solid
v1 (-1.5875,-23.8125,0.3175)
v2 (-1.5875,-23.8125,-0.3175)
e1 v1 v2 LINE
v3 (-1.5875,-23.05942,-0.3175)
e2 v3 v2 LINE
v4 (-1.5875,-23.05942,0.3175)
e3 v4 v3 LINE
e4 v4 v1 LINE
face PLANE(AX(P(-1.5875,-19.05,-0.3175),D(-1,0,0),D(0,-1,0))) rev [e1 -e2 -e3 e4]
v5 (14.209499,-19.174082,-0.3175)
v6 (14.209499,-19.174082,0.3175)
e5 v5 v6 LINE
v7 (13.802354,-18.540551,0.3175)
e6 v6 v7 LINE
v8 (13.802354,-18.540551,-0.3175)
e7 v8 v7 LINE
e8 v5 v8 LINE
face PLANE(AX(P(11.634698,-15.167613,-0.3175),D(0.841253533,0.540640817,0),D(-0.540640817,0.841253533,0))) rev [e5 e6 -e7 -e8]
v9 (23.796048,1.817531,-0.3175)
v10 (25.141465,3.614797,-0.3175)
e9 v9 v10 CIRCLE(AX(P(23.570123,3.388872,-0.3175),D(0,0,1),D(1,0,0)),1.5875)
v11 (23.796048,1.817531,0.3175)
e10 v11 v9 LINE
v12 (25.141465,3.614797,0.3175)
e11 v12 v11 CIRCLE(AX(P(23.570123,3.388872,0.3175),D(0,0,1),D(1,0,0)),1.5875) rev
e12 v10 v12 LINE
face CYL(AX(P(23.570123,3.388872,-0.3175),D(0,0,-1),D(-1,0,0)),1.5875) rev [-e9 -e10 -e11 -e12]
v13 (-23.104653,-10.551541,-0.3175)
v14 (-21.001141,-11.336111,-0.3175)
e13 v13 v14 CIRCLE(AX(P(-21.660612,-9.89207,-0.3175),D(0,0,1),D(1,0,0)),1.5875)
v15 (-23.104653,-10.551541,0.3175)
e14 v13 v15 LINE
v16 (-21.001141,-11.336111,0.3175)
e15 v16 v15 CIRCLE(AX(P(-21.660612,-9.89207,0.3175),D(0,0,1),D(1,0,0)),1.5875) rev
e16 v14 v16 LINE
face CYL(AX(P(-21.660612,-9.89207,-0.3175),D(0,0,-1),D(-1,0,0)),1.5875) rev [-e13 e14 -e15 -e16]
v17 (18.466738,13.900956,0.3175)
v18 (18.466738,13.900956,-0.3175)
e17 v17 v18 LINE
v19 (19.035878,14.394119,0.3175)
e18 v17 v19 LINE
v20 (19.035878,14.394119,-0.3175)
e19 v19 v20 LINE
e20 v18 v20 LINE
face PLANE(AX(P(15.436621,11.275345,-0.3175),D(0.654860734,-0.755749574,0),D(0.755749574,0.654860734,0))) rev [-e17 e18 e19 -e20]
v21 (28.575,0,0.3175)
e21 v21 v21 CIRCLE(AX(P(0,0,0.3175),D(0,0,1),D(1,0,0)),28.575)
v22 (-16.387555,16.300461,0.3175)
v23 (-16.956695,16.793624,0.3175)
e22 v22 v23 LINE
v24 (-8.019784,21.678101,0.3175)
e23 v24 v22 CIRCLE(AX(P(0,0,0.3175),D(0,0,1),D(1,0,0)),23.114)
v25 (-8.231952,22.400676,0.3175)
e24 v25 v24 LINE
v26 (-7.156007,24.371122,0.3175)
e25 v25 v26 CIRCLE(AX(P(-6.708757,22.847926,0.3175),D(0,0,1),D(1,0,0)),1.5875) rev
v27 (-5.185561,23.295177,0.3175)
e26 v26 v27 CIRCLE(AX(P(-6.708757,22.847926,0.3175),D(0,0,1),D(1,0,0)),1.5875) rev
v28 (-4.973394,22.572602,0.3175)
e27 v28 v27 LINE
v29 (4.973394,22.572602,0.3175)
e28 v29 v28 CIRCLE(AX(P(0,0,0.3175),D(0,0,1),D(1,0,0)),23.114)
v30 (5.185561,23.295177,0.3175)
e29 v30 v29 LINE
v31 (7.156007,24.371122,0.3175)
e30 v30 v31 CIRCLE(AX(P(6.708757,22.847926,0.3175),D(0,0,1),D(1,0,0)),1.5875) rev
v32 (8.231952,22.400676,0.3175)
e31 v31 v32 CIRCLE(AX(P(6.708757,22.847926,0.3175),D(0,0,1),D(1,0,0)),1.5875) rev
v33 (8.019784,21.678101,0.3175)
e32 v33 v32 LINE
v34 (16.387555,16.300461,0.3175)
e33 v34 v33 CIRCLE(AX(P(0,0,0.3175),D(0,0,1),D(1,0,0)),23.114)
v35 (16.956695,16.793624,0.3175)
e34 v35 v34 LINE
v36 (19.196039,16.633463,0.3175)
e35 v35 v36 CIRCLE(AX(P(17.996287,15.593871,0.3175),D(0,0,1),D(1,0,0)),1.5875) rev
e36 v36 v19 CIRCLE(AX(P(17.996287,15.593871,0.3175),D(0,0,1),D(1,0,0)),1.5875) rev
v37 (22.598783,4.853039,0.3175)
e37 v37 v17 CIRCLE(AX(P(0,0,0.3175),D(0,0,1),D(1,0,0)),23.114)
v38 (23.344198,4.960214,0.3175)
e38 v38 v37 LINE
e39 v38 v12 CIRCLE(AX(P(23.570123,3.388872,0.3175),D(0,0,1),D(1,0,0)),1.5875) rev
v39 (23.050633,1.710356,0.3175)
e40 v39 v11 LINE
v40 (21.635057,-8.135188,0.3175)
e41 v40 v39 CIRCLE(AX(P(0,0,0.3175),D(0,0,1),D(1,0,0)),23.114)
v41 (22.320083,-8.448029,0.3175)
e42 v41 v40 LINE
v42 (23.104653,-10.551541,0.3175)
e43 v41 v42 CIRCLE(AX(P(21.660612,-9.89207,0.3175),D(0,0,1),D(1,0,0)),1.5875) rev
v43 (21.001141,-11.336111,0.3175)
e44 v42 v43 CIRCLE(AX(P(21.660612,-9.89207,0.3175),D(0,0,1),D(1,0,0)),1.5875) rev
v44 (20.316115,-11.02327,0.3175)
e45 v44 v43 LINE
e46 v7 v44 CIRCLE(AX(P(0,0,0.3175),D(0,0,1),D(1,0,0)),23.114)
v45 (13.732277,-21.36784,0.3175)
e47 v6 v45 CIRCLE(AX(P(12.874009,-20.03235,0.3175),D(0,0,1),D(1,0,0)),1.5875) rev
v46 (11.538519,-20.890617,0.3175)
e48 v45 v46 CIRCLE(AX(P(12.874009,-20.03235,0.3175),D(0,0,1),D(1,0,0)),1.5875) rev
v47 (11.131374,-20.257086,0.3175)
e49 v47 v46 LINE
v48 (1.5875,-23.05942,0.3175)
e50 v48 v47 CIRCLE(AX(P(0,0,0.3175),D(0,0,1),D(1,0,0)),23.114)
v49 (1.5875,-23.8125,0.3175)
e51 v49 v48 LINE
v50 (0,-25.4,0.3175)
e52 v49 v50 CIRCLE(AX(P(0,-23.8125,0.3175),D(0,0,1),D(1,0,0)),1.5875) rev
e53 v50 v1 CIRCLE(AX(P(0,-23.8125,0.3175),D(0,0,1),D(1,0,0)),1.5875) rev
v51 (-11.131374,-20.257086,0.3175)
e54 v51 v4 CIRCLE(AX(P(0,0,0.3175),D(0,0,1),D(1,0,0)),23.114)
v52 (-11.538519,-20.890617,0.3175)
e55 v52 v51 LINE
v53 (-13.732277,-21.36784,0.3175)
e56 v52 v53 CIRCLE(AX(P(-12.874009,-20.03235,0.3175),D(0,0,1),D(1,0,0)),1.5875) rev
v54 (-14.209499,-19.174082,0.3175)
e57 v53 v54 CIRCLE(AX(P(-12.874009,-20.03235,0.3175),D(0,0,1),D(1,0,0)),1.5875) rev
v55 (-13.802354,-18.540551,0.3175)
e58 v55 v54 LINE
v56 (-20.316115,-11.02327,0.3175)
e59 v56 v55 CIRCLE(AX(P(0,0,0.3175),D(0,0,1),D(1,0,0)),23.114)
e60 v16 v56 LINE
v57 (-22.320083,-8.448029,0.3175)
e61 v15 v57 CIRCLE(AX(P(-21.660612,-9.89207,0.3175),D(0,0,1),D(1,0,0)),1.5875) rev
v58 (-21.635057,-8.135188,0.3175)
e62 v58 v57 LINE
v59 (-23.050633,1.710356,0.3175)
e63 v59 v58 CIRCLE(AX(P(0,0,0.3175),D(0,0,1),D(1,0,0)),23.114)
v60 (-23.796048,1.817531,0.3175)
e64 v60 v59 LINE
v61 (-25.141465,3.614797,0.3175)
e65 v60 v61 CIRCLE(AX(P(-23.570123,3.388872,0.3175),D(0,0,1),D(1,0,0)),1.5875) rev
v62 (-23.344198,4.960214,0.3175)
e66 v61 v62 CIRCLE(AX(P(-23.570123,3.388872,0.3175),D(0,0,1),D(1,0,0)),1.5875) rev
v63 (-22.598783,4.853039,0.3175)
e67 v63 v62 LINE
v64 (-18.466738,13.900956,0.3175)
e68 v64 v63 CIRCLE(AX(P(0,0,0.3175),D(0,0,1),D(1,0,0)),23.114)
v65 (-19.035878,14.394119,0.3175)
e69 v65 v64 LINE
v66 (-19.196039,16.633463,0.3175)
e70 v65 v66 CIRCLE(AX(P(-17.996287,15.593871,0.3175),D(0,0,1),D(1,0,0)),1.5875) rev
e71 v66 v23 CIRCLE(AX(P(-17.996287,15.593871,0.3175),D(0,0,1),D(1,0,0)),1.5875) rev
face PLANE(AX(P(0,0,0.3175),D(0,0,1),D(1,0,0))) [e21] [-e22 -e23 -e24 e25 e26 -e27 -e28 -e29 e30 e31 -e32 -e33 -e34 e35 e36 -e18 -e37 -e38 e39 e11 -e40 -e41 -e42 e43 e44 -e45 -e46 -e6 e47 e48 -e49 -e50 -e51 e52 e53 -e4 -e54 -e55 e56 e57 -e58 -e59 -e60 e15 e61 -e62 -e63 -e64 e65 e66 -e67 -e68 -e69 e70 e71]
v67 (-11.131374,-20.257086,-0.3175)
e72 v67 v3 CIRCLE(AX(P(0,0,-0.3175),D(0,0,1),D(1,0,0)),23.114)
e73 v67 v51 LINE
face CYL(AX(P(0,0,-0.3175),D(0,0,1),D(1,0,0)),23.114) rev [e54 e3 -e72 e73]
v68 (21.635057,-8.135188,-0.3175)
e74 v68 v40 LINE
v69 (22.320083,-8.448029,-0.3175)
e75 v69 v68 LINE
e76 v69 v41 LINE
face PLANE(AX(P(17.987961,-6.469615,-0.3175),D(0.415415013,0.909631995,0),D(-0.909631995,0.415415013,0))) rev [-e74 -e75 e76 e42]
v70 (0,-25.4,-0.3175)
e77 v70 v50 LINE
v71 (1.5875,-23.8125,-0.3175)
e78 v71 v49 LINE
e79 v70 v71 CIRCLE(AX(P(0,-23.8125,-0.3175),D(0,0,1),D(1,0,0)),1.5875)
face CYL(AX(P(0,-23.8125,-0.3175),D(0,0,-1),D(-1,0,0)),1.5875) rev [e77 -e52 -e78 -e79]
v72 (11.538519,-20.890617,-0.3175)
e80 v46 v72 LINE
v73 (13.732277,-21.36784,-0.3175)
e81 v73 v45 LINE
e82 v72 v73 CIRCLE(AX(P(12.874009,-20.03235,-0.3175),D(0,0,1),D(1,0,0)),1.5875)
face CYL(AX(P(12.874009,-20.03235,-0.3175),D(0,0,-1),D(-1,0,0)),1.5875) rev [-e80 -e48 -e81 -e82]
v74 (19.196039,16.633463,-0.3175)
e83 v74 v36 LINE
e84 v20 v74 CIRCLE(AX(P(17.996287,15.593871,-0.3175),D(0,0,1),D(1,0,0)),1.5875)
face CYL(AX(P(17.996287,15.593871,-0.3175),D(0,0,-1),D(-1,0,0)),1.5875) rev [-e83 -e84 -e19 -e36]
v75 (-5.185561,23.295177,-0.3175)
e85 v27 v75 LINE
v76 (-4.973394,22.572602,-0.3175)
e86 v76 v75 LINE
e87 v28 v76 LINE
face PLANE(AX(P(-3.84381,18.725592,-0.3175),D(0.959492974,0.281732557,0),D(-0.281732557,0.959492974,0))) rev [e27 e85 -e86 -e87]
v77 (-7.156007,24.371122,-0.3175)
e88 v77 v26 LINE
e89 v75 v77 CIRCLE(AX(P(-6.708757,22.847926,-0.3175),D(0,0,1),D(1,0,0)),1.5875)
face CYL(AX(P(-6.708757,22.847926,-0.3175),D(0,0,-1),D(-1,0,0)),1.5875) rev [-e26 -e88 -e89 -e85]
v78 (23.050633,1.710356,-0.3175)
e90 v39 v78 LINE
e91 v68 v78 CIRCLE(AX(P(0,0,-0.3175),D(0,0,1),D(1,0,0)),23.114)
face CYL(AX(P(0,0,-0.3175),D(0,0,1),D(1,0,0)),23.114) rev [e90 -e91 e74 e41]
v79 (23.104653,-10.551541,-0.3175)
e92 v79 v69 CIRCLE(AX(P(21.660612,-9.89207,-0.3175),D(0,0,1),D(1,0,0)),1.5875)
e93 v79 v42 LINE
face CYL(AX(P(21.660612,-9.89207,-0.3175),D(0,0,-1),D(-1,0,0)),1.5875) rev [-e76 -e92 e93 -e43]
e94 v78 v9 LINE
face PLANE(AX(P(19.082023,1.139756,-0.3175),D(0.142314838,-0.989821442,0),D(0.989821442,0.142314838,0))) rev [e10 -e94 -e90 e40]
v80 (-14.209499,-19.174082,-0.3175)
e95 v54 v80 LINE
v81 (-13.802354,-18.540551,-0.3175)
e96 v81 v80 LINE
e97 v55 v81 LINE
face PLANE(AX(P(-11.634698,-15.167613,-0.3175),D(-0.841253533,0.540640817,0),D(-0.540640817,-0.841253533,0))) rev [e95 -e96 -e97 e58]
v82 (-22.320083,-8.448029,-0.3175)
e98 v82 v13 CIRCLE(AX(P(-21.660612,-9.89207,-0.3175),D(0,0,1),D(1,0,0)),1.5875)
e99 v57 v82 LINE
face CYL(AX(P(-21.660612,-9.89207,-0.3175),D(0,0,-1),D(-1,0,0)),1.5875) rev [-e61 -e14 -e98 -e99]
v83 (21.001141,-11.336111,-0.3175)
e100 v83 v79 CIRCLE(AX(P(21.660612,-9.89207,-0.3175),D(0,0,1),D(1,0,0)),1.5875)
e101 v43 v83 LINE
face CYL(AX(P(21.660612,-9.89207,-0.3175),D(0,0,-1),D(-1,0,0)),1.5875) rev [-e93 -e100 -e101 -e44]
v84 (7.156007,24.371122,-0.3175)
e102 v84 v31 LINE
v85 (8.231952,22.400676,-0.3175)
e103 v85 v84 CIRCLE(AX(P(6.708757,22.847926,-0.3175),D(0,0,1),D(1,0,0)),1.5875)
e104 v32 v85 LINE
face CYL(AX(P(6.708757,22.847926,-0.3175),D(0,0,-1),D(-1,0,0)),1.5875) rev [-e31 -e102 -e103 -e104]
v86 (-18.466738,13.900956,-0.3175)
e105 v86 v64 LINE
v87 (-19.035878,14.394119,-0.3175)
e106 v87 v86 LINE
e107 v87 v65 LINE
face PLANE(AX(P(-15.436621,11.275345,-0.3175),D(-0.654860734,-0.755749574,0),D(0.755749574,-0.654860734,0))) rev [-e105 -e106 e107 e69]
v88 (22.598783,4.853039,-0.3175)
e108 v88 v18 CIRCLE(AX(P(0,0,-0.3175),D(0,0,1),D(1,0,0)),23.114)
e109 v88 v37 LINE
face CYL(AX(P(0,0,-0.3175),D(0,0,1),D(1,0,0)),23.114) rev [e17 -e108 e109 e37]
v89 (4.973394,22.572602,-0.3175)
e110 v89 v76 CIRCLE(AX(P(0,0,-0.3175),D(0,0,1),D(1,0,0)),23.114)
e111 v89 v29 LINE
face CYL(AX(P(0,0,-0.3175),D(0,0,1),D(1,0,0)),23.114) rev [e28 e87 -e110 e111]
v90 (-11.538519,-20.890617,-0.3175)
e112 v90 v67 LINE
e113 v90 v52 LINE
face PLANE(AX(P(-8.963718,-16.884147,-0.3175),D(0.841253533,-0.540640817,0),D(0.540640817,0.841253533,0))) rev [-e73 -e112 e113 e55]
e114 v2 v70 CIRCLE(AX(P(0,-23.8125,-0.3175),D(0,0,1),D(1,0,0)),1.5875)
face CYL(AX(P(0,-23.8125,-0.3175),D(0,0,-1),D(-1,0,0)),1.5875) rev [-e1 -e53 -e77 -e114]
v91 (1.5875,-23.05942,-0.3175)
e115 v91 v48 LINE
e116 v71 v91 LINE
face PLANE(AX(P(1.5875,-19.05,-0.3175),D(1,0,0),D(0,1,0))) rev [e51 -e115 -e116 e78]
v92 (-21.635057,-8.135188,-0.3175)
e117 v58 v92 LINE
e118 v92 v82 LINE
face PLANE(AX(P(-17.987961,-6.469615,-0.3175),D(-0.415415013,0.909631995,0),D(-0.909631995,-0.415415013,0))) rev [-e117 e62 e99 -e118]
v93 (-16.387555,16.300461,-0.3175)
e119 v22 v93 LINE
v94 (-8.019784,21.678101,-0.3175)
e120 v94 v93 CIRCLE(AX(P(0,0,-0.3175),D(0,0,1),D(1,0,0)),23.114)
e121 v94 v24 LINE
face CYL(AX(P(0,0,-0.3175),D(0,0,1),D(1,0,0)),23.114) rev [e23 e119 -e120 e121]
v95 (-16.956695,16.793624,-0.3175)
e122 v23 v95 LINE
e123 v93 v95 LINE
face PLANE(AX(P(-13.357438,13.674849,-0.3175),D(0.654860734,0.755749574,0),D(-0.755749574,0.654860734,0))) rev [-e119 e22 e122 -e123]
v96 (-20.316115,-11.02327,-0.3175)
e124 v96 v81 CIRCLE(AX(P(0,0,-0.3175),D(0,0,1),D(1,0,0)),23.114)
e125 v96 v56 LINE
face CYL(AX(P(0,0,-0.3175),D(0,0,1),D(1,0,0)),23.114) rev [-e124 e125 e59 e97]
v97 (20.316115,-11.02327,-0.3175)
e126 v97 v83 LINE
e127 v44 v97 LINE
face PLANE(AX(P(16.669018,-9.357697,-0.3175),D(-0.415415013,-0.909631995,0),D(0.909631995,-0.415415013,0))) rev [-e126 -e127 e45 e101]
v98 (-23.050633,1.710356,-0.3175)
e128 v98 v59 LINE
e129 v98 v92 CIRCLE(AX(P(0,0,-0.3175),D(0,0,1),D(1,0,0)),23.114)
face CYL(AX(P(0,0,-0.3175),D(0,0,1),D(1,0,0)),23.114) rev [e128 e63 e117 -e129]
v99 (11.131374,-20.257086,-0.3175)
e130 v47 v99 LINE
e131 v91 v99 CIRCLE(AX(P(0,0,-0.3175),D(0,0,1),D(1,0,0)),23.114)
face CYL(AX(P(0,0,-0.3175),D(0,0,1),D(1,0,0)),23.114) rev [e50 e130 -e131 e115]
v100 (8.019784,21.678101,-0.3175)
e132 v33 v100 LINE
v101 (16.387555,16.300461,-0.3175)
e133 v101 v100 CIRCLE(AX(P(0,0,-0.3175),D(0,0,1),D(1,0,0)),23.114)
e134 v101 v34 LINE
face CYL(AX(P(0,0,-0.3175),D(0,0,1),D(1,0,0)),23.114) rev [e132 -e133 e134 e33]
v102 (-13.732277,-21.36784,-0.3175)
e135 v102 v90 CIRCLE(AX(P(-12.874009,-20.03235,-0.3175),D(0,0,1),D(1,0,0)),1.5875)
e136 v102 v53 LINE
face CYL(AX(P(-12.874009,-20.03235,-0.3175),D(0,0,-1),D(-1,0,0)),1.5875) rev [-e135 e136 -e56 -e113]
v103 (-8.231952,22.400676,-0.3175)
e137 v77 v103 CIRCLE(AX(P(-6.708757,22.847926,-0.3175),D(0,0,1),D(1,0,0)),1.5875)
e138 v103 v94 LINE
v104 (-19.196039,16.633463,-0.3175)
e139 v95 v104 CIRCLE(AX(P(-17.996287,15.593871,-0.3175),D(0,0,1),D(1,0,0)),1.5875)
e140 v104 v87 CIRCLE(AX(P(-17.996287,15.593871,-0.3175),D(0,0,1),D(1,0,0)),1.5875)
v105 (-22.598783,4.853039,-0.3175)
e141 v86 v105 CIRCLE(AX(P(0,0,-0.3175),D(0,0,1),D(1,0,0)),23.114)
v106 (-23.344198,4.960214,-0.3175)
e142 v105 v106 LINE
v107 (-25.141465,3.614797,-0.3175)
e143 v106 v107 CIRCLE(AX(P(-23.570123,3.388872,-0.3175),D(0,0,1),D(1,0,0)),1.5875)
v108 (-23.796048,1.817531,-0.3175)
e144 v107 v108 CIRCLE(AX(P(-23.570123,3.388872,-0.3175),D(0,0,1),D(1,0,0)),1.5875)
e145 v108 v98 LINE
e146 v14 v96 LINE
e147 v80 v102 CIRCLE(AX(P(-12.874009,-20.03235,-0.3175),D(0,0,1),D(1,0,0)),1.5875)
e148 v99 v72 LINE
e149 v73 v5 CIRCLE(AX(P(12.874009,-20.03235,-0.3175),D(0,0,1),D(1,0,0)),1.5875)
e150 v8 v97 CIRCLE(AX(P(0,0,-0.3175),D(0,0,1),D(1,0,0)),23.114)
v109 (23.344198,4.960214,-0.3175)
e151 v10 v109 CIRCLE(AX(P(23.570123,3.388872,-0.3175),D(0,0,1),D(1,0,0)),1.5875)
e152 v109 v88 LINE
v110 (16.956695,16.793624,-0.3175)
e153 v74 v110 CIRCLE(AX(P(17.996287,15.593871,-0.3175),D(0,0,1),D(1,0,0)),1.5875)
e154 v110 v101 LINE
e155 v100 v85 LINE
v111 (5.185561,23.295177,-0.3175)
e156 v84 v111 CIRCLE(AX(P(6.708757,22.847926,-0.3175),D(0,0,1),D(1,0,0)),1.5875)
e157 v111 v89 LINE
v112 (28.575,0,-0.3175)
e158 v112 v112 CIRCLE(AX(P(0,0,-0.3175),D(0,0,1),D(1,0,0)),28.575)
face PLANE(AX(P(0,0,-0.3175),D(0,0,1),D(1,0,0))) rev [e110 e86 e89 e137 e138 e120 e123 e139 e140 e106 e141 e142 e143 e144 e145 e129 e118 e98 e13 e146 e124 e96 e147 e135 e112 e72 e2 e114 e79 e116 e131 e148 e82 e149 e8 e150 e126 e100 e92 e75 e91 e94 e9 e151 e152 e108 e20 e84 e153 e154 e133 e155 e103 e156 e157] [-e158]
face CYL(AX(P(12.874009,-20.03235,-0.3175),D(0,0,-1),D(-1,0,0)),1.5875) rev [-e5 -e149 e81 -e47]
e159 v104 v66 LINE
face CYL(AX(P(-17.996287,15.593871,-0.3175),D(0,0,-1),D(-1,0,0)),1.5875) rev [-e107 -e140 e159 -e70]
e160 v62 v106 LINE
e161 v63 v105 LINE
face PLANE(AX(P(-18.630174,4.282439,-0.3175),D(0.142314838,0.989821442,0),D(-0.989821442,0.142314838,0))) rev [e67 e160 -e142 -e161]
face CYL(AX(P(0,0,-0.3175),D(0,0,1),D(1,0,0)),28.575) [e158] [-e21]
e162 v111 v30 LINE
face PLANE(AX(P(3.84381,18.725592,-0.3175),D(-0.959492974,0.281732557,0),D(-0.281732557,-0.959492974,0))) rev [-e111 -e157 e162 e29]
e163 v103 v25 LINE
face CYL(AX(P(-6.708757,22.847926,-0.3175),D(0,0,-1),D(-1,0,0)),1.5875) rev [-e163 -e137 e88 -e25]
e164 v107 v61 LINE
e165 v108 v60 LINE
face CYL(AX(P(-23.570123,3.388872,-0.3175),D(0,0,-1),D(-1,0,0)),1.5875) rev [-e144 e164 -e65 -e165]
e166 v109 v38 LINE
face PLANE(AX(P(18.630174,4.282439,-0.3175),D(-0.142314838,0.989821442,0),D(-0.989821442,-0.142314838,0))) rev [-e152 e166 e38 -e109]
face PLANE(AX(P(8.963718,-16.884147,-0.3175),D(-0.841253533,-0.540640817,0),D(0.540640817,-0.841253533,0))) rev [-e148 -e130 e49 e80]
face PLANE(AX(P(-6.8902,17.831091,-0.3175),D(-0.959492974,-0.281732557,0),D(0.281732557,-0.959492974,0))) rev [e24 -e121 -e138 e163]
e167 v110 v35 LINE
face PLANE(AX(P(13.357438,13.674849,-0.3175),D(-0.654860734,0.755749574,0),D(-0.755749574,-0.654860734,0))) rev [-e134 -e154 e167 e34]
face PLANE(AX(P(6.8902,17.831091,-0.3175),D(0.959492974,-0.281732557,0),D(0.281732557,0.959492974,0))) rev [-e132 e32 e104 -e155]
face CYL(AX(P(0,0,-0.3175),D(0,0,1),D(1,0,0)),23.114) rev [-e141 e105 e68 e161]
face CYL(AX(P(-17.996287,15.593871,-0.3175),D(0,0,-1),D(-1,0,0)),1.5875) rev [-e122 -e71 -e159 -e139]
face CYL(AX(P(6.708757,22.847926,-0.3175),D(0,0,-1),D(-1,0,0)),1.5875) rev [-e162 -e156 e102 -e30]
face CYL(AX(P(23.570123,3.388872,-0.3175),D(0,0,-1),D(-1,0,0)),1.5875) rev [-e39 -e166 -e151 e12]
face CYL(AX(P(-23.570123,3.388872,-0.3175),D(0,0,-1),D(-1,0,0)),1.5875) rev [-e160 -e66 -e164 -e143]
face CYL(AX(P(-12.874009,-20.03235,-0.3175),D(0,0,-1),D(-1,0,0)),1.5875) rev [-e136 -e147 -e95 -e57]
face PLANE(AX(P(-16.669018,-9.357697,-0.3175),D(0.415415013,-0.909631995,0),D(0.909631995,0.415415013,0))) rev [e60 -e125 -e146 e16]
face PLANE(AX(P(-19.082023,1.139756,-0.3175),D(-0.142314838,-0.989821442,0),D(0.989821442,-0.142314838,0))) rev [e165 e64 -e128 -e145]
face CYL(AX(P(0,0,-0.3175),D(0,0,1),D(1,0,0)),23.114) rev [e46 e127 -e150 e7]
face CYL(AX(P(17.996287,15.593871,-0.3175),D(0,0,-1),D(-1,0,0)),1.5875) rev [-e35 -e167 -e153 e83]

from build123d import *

# Parameters (mm, degrees)
BOSS_EXTRUDE1_DEPTH      = 0.3175
BOSS_EXTRUDE1_DEPTH_BACK = 0.3175
SKETCH1_R                = 28.575
SKETCH1_R_2              = 23.114
SKETCH4_W                = 3.175
SKETCH4_H                = 6.35
CUT_EXTRUDE2_DEPTH       = 41.416141268
FILLET1_R                = 1.5875
CIRPATTERN1_COUNT        = 11
FILLET1_OF_CIRPATTERN1_R = 1.5875


with BuildPart() as part:
    # Sketch1 → Boss-Extrude1 (new, two sides: drawn at the far end of the back side and taken through both)
    with BuildSketch(Plane.XY.offset(-BOSS_EXTRUDE1_DEPTH_BACK)):
        Circle(SKETCH1_R)
        Circle(SKETCH1_R_2, mode=Mode.SUBTRACT)
    extrude(amount=BOSS_EXTRUDE1_DEPTH + BOSS_EXTRUDE1_DEPTH_BACK)

    # Sketch4 → Cut-Extrude2 (cut, through all)
    with BuildSketch(Plane.XY.offset(0.3175)):
        with Locations((0, -22.225)):
            Rectangle(SKETCH4_W, SKETCH4_H)
    cut_extrude2 = extrude(amount=-CUT_EXTRUDE2_DEPTH, mode=Mode.SUBTRACT)

    # Fillet1
    fillet1_edges = [part.edges().sort_by_distance(p)[0] for p in [
        (1.5875, -25.4, 0),
        (-1.5875, -25.4, 0),
    ]]
    fillet(fillet1_edges, radius=FILLET1_R - 0.0001)  # a hair under: the kernel refuses the full size

    # CirPattern1: Cut-Extrude2 ×11 about axis
    cirpattern1_axis = Axis((0, 0, 0), (0, 0, 1))
    for i in range(1, CIRPATTERN1_COUNT):
        add(cut_extrude2.rotate(cirpattern1_axis, i * 360 / CIRPATTERN1_COUNT), mode=Mode.SUBTRACT)

    # Fillet1 of CirPattern1
    fillet1_of_cirpattern1_edges = [part.edges().sort_by_distance(p)[0] for p in [
        (15.067766747, -20.509572436, 0),
        (12.39678678, -22.226107032, 0),
        (23.764124015, -9.107500538, 0),
        (22.445181349, -11.995582123, 0),
        (24.915539818, 5.186138431, 0),
        (25.36738943, 2.043455353, 0),
        (18.156447773, 17.833215091, 0),
        (20.235630604, 15.433710193, 0),
        (5.632811848, 24.818371964, 0),
        (8.679202039, 23.923871096, 0),
        (-8.679202039, 23.923871096, 0),
        (-5.632811848, 24.818371964, 0),
        (-20.235630604, 15.433710193, 0),
        (-18.156447773, 17.833215091, 0),
        (-25.36738943, 2.043455353, 0),
        (-24.915539818, 5.186138431, 0),
        (-22.445181349, -11.995582123, 0),
        (-23.764124015, -9.107500538, 0),
        (-12.39678678, -22.226107032, 0),
        (-15.067766747, -20.509572436, 0),
    ]]
    fillet(fillet1_of_cirpattern1_edges, radius=FILLET1_OF_CIRPATTERN1_R - 0.0001)  # a hair under: the kernel refuses the full size


solid = part.part
